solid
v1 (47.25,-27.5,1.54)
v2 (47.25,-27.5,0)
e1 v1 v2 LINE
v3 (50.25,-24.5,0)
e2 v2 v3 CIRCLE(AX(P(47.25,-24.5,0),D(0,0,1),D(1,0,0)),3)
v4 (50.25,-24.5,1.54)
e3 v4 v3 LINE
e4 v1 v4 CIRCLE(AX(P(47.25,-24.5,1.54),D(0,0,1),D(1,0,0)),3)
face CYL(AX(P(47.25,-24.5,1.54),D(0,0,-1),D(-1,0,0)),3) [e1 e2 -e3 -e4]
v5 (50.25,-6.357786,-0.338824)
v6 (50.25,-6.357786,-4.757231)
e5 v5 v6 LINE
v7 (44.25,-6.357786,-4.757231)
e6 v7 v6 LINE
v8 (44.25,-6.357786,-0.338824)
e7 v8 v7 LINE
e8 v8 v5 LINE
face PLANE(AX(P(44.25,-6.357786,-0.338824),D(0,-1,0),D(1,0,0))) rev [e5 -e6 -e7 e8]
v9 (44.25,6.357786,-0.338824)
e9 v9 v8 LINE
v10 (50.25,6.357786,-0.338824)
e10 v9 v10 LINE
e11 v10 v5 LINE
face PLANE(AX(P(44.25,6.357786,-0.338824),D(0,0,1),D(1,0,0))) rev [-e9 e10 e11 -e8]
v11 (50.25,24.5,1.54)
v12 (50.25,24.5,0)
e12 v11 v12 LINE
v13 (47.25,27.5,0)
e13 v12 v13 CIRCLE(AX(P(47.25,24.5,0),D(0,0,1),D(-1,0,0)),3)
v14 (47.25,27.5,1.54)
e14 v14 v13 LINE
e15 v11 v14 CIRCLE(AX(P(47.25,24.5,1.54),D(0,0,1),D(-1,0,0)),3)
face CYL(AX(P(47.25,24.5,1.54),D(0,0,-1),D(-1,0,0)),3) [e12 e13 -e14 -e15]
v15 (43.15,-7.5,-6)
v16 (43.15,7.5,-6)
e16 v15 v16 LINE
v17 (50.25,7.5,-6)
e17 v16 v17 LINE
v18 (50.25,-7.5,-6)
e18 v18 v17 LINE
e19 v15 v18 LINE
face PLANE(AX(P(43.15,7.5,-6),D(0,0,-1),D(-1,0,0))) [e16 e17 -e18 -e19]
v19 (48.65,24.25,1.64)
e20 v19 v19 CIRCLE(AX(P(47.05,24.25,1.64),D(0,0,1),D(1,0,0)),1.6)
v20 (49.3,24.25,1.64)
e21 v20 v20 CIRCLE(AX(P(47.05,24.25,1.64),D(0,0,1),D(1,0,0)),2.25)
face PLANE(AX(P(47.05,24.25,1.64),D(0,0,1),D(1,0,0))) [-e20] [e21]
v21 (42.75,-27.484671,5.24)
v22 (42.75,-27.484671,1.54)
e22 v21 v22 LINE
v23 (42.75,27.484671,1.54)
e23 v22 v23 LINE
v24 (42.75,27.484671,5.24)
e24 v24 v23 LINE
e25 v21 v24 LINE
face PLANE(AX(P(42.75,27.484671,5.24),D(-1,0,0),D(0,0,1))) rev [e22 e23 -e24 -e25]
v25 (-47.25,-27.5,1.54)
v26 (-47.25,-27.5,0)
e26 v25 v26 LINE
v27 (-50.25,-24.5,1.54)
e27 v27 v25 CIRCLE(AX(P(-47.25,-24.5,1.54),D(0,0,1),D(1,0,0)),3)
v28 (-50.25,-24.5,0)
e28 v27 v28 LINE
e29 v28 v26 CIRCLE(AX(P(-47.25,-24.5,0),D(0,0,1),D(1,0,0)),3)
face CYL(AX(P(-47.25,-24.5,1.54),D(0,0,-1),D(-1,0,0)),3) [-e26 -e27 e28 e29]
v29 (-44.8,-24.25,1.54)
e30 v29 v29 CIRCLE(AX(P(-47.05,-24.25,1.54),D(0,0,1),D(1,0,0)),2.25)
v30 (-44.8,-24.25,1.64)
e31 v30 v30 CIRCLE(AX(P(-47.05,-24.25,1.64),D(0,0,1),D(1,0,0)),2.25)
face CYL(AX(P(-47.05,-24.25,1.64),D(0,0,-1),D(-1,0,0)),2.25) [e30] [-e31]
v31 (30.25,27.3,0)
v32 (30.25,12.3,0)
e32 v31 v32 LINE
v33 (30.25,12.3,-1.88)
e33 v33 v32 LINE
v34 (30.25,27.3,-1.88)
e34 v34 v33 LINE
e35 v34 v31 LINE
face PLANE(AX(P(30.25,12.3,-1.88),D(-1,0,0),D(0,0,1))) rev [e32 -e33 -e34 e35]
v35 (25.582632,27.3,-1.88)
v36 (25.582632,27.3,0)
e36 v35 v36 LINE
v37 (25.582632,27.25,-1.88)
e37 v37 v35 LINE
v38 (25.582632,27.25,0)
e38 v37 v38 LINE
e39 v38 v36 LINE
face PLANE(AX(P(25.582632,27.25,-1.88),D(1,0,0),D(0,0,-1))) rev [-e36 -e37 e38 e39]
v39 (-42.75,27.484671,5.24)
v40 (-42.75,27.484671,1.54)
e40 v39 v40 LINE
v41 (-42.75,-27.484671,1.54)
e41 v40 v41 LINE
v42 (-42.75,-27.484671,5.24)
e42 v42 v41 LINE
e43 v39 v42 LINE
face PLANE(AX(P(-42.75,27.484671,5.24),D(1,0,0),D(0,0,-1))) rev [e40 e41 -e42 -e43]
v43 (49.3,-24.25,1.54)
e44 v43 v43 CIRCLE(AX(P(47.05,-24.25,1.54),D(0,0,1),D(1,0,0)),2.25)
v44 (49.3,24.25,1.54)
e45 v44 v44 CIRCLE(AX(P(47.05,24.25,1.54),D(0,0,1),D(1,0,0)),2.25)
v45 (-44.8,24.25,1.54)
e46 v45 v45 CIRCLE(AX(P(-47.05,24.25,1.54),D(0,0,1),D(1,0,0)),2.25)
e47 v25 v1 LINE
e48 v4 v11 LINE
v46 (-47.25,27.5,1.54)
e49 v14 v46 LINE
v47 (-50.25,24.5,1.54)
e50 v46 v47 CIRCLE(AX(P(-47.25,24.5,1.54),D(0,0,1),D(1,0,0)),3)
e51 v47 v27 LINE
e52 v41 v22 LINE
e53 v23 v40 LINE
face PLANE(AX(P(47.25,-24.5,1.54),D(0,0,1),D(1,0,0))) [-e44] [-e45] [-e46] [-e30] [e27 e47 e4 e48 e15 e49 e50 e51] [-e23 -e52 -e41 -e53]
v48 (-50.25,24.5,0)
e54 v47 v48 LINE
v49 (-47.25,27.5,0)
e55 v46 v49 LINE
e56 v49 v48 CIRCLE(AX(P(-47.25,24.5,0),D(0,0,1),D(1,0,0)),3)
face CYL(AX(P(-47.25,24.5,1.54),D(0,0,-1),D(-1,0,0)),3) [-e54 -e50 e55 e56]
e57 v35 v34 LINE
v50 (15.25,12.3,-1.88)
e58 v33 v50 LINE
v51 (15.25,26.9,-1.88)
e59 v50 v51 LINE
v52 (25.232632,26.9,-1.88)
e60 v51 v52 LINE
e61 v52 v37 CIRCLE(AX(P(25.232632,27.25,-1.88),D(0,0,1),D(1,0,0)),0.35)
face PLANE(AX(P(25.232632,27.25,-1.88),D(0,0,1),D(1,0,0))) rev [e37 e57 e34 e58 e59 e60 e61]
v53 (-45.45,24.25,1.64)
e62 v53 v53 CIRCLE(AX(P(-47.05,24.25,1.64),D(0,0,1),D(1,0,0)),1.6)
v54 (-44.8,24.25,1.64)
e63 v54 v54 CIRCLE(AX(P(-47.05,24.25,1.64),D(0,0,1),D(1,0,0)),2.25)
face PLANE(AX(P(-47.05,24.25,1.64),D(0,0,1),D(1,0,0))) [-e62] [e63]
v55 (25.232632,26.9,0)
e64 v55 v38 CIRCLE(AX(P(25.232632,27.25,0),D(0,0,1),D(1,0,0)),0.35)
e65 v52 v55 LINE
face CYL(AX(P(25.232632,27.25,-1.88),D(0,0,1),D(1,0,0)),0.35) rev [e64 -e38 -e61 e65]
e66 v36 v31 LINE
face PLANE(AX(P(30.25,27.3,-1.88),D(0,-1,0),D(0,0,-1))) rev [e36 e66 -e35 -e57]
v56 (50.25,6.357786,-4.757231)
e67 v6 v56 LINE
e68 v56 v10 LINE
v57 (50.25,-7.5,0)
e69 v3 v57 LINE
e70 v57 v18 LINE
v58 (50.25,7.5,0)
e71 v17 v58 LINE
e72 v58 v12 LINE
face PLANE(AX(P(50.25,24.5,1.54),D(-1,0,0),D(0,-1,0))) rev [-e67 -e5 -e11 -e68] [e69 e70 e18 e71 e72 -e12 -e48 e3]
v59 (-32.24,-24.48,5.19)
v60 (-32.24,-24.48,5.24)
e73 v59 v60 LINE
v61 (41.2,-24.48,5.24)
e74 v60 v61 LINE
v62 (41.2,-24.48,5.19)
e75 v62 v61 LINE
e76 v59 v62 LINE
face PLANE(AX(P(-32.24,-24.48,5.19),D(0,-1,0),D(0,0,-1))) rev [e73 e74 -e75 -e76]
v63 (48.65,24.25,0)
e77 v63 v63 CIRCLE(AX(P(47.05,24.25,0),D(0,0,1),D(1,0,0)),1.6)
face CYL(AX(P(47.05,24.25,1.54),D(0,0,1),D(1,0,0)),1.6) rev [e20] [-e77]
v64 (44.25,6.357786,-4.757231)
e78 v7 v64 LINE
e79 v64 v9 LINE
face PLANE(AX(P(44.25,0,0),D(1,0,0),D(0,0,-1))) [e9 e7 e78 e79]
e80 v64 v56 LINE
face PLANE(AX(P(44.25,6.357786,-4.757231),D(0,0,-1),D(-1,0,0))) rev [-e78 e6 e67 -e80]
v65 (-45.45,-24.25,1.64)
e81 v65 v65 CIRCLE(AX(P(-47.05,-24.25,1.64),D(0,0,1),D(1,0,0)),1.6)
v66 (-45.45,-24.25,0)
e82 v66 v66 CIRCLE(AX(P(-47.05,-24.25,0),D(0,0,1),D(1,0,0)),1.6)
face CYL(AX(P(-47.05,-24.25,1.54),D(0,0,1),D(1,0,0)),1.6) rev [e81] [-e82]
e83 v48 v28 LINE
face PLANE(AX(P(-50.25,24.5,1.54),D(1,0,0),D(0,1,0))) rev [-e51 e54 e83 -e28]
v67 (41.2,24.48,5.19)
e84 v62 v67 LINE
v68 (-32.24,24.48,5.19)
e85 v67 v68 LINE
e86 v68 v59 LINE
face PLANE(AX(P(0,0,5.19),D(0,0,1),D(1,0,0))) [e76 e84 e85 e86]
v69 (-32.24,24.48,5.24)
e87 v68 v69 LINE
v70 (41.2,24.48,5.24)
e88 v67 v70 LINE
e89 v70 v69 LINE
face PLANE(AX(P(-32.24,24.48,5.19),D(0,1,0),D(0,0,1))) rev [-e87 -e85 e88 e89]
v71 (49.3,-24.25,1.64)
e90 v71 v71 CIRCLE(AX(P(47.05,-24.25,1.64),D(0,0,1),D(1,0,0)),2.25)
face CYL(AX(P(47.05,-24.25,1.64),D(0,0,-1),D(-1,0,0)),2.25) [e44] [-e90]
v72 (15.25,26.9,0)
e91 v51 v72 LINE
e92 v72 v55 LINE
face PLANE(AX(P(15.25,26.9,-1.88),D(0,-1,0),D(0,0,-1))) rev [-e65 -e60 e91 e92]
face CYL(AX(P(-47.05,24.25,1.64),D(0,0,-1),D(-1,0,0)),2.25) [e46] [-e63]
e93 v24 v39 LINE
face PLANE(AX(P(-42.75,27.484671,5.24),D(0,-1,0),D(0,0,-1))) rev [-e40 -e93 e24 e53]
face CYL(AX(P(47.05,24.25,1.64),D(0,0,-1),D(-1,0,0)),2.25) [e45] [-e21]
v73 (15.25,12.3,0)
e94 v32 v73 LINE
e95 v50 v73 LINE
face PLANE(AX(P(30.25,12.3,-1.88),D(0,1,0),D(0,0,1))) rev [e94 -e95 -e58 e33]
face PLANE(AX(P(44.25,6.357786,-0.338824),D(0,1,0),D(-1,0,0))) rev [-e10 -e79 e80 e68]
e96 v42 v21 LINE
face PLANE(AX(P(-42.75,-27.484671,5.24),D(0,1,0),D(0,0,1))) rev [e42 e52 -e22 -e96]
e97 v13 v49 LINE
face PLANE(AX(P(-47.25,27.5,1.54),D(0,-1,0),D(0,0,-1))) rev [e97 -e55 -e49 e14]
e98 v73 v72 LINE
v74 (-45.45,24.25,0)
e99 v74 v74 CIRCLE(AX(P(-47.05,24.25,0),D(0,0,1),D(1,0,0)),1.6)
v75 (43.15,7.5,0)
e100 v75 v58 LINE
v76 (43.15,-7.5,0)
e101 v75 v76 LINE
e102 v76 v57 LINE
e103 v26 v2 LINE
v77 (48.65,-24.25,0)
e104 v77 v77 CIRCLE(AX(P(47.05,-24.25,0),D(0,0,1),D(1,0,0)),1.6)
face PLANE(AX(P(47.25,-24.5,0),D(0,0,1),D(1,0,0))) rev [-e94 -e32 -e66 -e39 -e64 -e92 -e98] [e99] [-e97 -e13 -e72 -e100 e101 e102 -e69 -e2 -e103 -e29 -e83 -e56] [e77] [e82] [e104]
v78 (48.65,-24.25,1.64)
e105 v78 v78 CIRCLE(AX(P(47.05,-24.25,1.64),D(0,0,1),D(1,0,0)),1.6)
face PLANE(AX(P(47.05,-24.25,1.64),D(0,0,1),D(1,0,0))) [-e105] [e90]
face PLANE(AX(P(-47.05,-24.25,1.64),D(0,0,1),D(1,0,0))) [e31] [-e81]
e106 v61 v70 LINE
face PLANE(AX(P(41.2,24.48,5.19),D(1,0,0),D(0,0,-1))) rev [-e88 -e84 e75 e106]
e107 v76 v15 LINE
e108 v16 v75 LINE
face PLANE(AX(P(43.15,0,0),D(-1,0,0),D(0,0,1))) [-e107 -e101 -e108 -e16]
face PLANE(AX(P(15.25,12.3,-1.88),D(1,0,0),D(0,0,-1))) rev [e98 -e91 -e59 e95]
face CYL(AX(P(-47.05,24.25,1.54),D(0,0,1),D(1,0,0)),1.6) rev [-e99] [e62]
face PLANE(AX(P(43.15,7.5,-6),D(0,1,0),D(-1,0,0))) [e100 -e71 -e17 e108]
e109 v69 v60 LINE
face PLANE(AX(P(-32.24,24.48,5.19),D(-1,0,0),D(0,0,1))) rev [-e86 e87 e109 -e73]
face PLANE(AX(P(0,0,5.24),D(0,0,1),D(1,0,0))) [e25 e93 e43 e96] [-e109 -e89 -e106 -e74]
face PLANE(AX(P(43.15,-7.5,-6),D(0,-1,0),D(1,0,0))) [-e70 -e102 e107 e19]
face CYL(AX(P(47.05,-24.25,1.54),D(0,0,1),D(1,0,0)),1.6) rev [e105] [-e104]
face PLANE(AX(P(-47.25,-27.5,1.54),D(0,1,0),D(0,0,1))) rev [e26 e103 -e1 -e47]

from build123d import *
from build123d.topology import SkipClean

# Parameters (mm, degrees)
BOSS_EXTRUDE1_DEPTH        = 1.54
F_3_2_3_2_DIAMETER_HOLE1_D = 3.2
SKETCH4_R                  = 2.25
SKETCH4_R_2                = 1.6
BOSS_EXTRUDE2_DEPTH        = 0.1
SKETCH5_W                  = 85.5
SKETCH5_H                  = 54.969341598
BOSS_EXTRUDE3_DEPTH        = 3.7
SKETCH6_W                  = 73.44
SKETCH6_H                  = 48.96
CUT_EXTRUDE1_DEPTH         = 0.05
SKETCH7_W                  = 6
SKETCH7_H                  = 15
BOSS_EXTRUDE4_DEPTH        = 7.1
SKETCH8_W                  = 4.418406876
SKETCH8_H                  = 12.715571876
CUT_EXTRUDE2_DEPTH         = 6
BOSS_EXTRUDE5_DEPTH        = 1.88


with BuildPart() as part:
    # Sketch1 → Boss-Extrude1 (new body)
    with BuildSketch(Plane.XY):
        with BuildLine():
            Line((-47.25, 27.5), (47.25, 27.5))
            ThreePointArc((47.25, 27.5), (49.371320344, 26.621320344), (50.25, 24.5))
            Line((50.25, 24.5), (50.25, -24.5))
            ThreePointArc((50.25, -24.5), (49.371320344, -26.621320344), (47.25, -27.5))
            Line((47.25, -27.5), (-47.25, -27.5))
            ThreePointArc((-47.25, -27.5), (-49.371320344, -26.621320344), (-50.25, -24.5))
            Line((-50.25, -24.5), (-50.25, 24.5))
            ThreePointArc((-50.25, 24.5), (-49.371320344, 26.621320344), (-47.25, 27.5))
        make_face()
    extrude(amount=BOSS_EXTRUDE1_DEPTH)

    # Ø3.2 (3.2) Diameter Hole1 (through all)
    with Locations(Plane.XY.offset(1.54)):
        with Locations((-47.05, 24.25), (47.05, 24.25), (47.05, -24.25), (-47.05, -24.25)):
            Hole(F_3_2_3_2_DIAMETER_HOLE1_D / 2)

    # Sketch4 → Boss-Extrude2 (add)
    # profile 1 of 4: a face of its own
    with SkipClean():  # the faces are left unmerged after this step: merging them gives an invalid solid
        with BuildSketch(Plane.XY.offset(1.54)):
            with Locations((-47.05, 24.25)):
                Circle(SKETCH4_R)
            with Locations((-47.05, 24.25)):
                Circle(SKETCH4_R_2, mode=Mode.SUBTRACT)
        # profile 2 of 4: a face of its own
        with BuildSketch(Plane.XY.offset(1.54)):
            with Locations((-47.05, -24.25)):
                Circle(SKETCH4_R)
            with Locations((-47.05, -24.25)):
                Circle(SKETCH4_R_2, mode=Mode.SUBTRACT)
        # profile 3 of 4: a face of its own
        with BuildSketch(Plane.XY.offset(1.54)):
            with Locations((47.05, -24.25)):
                Circle(SKETCH4_R)
            with Locations((47.05, -24.25)):
                Circle(SKETCH4_R_2, mode=Mode.SUBTRACT)
        # profile 4 of 4: a face of its own
        with BuildSketch(Plane.XY.offset(1.54)):
            with Locations((47.05, 24.25)):
                Circle(SKETCH4_R)
            with Locations((47.05, 24.25)):
                Circle(SKETCH4_R_2, mode=Mode.SUBTRACT)
        extrude(amount=BOSS_EXTRUDE2_DEPTH)
    add(part.part.scale(1), mode=Mode.REPLACE)  # the faces are merged on a copy

    # Sketch5 → Boss-Extrude3 (add)
    with BuildSketch(Plane.XY.offset(1.54)):
        Rectangle(SKETCH5_W, SKETCH5_H)
    extrude(amount=BOSS_EXTRUDE3_DEPTH)

    # Sketch6 → Cut-Extrude1 (cut)
    with BuildSketch(Plane.XY.offset(5.24)):
        with Locations((4.48, 0)):
            Rectangle(SKETCH6_W, SKETCH6_H)
    extrude(amount=-CUT_EXTRUDE1_DEPTH, mode=Mode.SUBTRACT)

    # Sketch7 → Boss-Extrude4 (add)
    with BuildSketch(Plane(origin=(50.25, 0, 0), x_dir=(0, 0, -1), z_dir=(1, 0, 0))):
        with Locations((3, 0)):
            Rectangle(SKETCH7_W, SKETCH7_H)
    extrude(amount=-BOSS_EXTRUDE4_DEPTH)

    # Sketch8 → Cut-Extrude2 (cut)
    with BuildSketch(Plane(origin=(50.25, 0, 0), x_dir=(0, 0, -1), z_dir=(1, 0, 0))):
        with Locations((2.548027157, 0)):
            Rectangle(SKETCH8_W, SKETCH8_H)
    extrude(amount=-CUT_EXTRUDE2_DEPTH, mode=Mode.SUBTRACT)

    # Sketch9 → Boss-Extrude5 (add)
    with BuildSketch(Plane(origin=(0, 0, 0), x_dir=(-1, 0, 0), z_dir=(0, 0, -1))):
        with BuildLine():
            Line((-30.25, 12.3), (-15.25, 12.3))
            Line((-15.25, 12.3), (-15.25, 26.9))
            Line((-15.25, 26.9), (-25.232632272, 26.9))
            ThreePointArc((-25.232632272, 26.9), (-25.480119645, 27.002512627), (-25.582632272, 27.25))
            Line((-25.582632272, 27.25), (-25.582632272, 27.3))
            Line((-25.582632272, 27.3), (-30.25, 27.3))
            Line((-30.25, 27.3), (-30.25, 12.3))
        make_face()
    extrude(amount=BOSS_EXTRUDE5_DEPTH)


solid = part.part
